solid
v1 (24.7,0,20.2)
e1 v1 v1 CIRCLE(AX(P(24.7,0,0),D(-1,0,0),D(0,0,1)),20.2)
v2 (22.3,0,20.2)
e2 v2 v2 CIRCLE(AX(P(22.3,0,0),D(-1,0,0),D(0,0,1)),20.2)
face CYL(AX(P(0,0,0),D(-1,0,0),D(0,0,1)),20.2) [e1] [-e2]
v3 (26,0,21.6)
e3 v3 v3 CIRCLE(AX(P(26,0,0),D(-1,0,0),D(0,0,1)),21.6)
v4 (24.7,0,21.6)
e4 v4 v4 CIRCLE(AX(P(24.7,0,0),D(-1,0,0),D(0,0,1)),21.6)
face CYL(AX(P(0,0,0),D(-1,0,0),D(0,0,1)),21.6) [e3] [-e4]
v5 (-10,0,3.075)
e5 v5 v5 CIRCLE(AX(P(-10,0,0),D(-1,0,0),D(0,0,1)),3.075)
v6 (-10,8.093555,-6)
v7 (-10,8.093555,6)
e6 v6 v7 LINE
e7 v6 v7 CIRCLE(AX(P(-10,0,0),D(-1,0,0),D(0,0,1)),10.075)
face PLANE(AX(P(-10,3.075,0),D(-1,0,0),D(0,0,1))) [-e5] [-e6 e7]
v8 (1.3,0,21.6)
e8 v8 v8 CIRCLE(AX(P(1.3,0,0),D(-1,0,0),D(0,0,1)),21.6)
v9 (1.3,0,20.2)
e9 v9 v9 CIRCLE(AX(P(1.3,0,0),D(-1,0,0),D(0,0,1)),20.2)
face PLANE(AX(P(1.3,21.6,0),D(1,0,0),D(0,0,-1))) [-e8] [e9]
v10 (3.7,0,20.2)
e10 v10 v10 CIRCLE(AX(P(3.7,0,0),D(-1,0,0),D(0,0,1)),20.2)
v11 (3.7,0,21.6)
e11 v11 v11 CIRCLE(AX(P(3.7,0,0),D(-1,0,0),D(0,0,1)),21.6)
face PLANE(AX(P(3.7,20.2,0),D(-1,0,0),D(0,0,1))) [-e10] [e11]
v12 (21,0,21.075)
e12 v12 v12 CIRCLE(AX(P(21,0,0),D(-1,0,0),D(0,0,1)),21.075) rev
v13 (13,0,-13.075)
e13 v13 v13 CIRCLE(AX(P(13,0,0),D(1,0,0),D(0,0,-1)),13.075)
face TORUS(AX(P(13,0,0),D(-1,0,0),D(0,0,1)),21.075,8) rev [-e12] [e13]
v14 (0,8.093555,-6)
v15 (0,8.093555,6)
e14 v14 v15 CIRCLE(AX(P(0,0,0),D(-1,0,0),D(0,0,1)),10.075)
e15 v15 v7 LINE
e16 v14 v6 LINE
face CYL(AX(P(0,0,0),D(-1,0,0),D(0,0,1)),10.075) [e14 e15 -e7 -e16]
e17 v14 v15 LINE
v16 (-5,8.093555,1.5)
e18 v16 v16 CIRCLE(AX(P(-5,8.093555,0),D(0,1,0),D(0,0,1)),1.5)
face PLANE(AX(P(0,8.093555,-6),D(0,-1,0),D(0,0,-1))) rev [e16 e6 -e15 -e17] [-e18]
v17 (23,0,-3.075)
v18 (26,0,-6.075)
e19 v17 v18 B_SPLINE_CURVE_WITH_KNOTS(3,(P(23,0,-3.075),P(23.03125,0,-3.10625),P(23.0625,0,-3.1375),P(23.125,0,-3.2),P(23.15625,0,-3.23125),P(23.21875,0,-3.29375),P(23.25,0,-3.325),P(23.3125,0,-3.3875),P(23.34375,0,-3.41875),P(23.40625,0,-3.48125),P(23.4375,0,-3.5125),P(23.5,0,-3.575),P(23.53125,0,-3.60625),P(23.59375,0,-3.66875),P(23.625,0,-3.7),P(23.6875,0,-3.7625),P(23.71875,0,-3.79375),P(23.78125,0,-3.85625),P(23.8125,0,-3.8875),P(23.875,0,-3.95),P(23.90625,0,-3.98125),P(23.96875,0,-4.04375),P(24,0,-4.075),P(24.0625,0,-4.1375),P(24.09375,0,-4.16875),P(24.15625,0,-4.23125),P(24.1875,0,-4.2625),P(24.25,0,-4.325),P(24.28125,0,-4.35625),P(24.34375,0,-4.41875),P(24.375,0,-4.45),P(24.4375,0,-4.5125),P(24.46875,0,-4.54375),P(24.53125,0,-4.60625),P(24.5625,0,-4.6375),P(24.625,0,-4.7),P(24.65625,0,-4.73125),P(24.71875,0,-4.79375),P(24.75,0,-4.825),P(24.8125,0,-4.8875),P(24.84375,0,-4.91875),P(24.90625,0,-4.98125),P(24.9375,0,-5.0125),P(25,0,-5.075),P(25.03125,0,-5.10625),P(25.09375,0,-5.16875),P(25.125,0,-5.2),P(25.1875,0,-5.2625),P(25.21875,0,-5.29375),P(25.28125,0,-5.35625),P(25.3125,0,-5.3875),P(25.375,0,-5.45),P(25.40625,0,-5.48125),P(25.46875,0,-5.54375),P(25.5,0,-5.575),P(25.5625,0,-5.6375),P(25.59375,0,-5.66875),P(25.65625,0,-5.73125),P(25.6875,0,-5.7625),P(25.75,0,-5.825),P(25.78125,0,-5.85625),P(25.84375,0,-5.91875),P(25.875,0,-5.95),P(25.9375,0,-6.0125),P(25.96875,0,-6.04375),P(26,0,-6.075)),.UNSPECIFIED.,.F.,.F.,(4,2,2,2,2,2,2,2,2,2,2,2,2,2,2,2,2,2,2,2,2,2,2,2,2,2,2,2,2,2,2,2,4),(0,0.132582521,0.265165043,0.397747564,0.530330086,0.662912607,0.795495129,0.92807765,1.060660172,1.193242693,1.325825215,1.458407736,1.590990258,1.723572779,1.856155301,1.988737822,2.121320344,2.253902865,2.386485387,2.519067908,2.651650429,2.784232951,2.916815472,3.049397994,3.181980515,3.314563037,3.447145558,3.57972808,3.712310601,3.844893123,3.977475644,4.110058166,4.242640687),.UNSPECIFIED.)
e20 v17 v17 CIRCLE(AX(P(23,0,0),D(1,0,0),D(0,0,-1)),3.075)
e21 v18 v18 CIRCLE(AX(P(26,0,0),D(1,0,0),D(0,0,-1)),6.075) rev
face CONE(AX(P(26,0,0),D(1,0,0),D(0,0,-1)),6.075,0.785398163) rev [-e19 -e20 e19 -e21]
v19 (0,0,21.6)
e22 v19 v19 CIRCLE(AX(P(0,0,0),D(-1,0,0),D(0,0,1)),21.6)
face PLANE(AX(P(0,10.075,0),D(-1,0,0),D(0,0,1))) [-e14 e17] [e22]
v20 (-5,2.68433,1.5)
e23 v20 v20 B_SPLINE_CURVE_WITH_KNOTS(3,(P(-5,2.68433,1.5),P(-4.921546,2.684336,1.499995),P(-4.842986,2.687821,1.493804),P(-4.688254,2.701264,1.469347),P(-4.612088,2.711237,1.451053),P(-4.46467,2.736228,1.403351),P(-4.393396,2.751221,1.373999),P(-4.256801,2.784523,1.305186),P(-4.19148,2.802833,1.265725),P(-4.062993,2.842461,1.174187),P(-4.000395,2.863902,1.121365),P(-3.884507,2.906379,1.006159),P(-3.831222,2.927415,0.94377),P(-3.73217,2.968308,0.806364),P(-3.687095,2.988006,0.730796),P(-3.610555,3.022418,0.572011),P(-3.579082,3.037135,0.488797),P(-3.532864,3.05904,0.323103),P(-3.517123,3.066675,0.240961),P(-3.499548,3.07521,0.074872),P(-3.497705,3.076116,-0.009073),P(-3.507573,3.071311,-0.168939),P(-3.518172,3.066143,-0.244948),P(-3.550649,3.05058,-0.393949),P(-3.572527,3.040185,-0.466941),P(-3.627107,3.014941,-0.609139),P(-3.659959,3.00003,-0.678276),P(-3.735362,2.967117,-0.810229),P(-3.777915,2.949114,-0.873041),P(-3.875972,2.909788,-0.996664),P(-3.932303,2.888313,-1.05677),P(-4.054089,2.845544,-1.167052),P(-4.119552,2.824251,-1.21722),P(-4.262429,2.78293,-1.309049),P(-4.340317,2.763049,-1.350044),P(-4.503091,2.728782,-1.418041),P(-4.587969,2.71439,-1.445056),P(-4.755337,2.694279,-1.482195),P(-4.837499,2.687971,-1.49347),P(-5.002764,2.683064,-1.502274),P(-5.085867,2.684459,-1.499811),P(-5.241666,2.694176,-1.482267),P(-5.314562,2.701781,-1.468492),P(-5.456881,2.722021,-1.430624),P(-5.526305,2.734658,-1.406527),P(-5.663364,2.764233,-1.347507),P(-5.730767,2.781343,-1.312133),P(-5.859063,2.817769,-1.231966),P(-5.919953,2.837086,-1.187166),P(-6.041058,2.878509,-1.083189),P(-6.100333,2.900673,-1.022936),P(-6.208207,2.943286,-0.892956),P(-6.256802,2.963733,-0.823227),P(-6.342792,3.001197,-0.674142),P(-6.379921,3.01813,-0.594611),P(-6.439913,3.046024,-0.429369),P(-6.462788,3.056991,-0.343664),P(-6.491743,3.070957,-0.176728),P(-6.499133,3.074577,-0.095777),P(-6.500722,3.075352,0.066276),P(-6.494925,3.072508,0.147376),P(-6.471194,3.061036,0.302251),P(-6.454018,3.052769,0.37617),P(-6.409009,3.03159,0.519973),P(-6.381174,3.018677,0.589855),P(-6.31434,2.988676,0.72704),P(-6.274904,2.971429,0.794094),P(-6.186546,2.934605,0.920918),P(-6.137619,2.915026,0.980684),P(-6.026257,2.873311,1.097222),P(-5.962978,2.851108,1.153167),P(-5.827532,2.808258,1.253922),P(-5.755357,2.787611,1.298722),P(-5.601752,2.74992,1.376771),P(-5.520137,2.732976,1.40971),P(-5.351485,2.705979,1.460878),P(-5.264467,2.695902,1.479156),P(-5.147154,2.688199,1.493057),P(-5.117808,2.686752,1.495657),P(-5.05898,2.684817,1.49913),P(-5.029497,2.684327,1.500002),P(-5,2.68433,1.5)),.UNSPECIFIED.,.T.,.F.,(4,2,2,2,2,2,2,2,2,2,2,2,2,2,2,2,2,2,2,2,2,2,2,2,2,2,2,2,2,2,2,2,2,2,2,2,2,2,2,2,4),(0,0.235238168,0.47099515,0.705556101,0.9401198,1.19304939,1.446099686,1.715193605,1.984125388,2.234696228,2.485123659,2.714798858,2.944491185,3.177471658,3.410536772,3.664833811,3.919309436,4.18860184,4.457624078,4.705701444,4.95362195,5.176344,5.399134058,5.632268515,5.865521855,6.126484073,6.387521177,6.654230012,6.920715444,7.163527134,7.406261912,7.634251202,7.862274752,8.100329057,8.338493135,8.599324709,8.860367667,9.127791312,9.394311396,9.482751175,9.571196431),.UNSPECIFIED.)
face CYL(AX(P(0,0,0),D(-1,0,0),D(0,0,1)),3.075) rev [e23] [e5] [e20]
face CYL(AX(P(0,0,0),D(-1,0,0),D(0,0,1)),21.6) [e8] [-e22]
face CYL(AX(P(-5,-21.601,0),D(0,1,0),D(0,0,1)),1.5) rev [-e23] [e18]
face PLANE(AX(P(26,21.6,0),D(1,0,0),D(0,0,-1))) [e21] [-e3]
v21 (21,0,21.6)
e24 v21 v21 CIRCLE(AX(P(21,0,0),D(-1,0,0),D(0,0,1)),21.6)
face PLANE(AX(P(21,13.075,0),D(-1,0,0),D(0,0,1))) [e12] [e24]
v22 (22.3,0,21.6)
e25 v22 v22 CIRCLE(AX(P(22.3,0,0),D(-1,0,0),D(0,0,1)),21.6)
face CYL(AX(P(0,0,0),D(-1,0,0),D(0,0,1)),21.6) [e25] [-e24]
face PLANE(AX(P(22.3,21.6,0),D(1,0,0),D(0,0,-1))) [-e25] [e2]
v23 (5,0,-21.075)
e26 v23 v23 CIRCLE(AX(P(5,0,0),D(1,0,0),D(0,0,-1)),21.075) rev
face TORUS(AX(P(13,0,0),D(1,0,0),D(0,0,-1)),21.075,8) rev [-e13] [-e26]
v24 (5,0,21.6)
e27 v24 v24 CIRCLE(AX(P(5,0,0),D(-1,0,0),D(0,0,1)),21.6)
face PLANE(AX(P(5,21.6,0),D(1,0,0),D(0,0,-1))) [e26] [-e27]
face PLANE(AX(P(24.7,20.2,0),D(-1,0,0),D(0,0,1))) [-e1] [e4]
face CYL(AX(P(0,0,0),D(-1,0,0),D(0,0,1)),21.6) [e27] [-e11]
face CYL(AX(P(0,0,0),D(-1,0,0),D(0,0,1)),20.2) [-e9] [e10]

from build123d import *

# Parameters (mm, degrees)
FILLET3_R               = 8
FILLET4_R               = 8
SKETCH3_W               = 12
SKETCH3_H               = 3.642473792
CUT_EXTRUDE1_DEPTH      = 10
CUT_EXTRUDE2_REACH      = 46.992
CUT_EXTRUDE2_END_RADIUS = 3.075
SKETCH4_R               = 1.5
CHAMFER1_SIZE           = 3


with BuildPart() as part:
    # Sketch1 → Revolve1 (revolve)
    with BuildSketch(Plane.XY, mode=Mode.PRIVATE) as revolve1_sk:
        Polygon((0, 21.6), (1.3, 21.6), (1.3, 20.2), (3.7, 20.2), (3.7, 21.6), (5, 21.6), (5, 13.075), (21, 13.075), (21, 21.6), (22.3, 21.6), (22.3, 20.2), (24.7, 20.2), (24.7, 21.6), (26, 21.6), (26, 3.075), (-10, 3.075), (-10, 10.075), (0, 10.075), align=None)
    revolve(revolve1_sk.sketch.rotate(Axis((0, 0, 0), (1, 0, 0)), 90), axis=Axis((0, 0, 0), (1, 0, 0)))

    # Fillet3
    fillet3_edges = [part.edges().sort_by_distance(p)[0] for p in [
        (5, 0, -13.075),
    ]]
    fillet(fillet3_edges, radius=FILLET3_R)

    # Fillet4
    fillet4_edges = [part.edges().sort_by_distance(p)[0] for p in [
        (21, 0, -13.075),
    ]]
    fillet(fillet4_edges, radius=FILLET4_R - 0.0001)  # a hair under: the kernel refuses the full size

    # Sketch3 → Cut-Extrude1 (cut)
    with BuildSketch(Plane.ZY.offset(10)):
        with Locations((0, 9.91479143)):
            Rectangle(SKETCH3_W, SKETCH3_H)
    extrude(amount=-CUT_EXTRUDE1_DEPTH, mode=Mode.SUBTRACT)

    # Cut-Extrude2: up to this cylinder (the profile starts outside it)
    cut_extrude2_end = Plane(origin=(-5, 0, 0), z_dir=(-1, 0, 0)) * Cylinder(CUT_EXTRUDE2_END_RADIUS, 101.134, mode=Mode.PRIVATE)
    # Sketch4 → Cut-Extrude2 (cut, up to the surface)
    with BuildSketch(Plane(origin=(0, 8.093554534, 0), x_dir=(1, 0, 0), z_dir=(0, 1, 0)), mode=Mode.PRIVATE) as cut_extrude2_sk1:
        with Locations(Location((-5, 0, 0), (0, 0, 270))):
            Circle(SKETCH4_R)
    cut_extrude2_tool1 = extrude(cut_extrude2_sk1.sketch, amount=-CUT_EXTRUDE2_REACH, mode=Mode.PRIVATE) - cut_extrude2_end
    add(cut_extrude2_tool1.solids().sort_by_distance((-5, 8.093555, 0))[0], mode=Mode.SUBTRACT)

    # Chamfer1
    chamfer1_edges = [part.edges().sort_by_distance(p)[0] for p in [
        (26, 0, -3.075),
    ]]
    chamfer(chamfer1_edges, length=CHAMFER1_SIZE)


solid = part.part
